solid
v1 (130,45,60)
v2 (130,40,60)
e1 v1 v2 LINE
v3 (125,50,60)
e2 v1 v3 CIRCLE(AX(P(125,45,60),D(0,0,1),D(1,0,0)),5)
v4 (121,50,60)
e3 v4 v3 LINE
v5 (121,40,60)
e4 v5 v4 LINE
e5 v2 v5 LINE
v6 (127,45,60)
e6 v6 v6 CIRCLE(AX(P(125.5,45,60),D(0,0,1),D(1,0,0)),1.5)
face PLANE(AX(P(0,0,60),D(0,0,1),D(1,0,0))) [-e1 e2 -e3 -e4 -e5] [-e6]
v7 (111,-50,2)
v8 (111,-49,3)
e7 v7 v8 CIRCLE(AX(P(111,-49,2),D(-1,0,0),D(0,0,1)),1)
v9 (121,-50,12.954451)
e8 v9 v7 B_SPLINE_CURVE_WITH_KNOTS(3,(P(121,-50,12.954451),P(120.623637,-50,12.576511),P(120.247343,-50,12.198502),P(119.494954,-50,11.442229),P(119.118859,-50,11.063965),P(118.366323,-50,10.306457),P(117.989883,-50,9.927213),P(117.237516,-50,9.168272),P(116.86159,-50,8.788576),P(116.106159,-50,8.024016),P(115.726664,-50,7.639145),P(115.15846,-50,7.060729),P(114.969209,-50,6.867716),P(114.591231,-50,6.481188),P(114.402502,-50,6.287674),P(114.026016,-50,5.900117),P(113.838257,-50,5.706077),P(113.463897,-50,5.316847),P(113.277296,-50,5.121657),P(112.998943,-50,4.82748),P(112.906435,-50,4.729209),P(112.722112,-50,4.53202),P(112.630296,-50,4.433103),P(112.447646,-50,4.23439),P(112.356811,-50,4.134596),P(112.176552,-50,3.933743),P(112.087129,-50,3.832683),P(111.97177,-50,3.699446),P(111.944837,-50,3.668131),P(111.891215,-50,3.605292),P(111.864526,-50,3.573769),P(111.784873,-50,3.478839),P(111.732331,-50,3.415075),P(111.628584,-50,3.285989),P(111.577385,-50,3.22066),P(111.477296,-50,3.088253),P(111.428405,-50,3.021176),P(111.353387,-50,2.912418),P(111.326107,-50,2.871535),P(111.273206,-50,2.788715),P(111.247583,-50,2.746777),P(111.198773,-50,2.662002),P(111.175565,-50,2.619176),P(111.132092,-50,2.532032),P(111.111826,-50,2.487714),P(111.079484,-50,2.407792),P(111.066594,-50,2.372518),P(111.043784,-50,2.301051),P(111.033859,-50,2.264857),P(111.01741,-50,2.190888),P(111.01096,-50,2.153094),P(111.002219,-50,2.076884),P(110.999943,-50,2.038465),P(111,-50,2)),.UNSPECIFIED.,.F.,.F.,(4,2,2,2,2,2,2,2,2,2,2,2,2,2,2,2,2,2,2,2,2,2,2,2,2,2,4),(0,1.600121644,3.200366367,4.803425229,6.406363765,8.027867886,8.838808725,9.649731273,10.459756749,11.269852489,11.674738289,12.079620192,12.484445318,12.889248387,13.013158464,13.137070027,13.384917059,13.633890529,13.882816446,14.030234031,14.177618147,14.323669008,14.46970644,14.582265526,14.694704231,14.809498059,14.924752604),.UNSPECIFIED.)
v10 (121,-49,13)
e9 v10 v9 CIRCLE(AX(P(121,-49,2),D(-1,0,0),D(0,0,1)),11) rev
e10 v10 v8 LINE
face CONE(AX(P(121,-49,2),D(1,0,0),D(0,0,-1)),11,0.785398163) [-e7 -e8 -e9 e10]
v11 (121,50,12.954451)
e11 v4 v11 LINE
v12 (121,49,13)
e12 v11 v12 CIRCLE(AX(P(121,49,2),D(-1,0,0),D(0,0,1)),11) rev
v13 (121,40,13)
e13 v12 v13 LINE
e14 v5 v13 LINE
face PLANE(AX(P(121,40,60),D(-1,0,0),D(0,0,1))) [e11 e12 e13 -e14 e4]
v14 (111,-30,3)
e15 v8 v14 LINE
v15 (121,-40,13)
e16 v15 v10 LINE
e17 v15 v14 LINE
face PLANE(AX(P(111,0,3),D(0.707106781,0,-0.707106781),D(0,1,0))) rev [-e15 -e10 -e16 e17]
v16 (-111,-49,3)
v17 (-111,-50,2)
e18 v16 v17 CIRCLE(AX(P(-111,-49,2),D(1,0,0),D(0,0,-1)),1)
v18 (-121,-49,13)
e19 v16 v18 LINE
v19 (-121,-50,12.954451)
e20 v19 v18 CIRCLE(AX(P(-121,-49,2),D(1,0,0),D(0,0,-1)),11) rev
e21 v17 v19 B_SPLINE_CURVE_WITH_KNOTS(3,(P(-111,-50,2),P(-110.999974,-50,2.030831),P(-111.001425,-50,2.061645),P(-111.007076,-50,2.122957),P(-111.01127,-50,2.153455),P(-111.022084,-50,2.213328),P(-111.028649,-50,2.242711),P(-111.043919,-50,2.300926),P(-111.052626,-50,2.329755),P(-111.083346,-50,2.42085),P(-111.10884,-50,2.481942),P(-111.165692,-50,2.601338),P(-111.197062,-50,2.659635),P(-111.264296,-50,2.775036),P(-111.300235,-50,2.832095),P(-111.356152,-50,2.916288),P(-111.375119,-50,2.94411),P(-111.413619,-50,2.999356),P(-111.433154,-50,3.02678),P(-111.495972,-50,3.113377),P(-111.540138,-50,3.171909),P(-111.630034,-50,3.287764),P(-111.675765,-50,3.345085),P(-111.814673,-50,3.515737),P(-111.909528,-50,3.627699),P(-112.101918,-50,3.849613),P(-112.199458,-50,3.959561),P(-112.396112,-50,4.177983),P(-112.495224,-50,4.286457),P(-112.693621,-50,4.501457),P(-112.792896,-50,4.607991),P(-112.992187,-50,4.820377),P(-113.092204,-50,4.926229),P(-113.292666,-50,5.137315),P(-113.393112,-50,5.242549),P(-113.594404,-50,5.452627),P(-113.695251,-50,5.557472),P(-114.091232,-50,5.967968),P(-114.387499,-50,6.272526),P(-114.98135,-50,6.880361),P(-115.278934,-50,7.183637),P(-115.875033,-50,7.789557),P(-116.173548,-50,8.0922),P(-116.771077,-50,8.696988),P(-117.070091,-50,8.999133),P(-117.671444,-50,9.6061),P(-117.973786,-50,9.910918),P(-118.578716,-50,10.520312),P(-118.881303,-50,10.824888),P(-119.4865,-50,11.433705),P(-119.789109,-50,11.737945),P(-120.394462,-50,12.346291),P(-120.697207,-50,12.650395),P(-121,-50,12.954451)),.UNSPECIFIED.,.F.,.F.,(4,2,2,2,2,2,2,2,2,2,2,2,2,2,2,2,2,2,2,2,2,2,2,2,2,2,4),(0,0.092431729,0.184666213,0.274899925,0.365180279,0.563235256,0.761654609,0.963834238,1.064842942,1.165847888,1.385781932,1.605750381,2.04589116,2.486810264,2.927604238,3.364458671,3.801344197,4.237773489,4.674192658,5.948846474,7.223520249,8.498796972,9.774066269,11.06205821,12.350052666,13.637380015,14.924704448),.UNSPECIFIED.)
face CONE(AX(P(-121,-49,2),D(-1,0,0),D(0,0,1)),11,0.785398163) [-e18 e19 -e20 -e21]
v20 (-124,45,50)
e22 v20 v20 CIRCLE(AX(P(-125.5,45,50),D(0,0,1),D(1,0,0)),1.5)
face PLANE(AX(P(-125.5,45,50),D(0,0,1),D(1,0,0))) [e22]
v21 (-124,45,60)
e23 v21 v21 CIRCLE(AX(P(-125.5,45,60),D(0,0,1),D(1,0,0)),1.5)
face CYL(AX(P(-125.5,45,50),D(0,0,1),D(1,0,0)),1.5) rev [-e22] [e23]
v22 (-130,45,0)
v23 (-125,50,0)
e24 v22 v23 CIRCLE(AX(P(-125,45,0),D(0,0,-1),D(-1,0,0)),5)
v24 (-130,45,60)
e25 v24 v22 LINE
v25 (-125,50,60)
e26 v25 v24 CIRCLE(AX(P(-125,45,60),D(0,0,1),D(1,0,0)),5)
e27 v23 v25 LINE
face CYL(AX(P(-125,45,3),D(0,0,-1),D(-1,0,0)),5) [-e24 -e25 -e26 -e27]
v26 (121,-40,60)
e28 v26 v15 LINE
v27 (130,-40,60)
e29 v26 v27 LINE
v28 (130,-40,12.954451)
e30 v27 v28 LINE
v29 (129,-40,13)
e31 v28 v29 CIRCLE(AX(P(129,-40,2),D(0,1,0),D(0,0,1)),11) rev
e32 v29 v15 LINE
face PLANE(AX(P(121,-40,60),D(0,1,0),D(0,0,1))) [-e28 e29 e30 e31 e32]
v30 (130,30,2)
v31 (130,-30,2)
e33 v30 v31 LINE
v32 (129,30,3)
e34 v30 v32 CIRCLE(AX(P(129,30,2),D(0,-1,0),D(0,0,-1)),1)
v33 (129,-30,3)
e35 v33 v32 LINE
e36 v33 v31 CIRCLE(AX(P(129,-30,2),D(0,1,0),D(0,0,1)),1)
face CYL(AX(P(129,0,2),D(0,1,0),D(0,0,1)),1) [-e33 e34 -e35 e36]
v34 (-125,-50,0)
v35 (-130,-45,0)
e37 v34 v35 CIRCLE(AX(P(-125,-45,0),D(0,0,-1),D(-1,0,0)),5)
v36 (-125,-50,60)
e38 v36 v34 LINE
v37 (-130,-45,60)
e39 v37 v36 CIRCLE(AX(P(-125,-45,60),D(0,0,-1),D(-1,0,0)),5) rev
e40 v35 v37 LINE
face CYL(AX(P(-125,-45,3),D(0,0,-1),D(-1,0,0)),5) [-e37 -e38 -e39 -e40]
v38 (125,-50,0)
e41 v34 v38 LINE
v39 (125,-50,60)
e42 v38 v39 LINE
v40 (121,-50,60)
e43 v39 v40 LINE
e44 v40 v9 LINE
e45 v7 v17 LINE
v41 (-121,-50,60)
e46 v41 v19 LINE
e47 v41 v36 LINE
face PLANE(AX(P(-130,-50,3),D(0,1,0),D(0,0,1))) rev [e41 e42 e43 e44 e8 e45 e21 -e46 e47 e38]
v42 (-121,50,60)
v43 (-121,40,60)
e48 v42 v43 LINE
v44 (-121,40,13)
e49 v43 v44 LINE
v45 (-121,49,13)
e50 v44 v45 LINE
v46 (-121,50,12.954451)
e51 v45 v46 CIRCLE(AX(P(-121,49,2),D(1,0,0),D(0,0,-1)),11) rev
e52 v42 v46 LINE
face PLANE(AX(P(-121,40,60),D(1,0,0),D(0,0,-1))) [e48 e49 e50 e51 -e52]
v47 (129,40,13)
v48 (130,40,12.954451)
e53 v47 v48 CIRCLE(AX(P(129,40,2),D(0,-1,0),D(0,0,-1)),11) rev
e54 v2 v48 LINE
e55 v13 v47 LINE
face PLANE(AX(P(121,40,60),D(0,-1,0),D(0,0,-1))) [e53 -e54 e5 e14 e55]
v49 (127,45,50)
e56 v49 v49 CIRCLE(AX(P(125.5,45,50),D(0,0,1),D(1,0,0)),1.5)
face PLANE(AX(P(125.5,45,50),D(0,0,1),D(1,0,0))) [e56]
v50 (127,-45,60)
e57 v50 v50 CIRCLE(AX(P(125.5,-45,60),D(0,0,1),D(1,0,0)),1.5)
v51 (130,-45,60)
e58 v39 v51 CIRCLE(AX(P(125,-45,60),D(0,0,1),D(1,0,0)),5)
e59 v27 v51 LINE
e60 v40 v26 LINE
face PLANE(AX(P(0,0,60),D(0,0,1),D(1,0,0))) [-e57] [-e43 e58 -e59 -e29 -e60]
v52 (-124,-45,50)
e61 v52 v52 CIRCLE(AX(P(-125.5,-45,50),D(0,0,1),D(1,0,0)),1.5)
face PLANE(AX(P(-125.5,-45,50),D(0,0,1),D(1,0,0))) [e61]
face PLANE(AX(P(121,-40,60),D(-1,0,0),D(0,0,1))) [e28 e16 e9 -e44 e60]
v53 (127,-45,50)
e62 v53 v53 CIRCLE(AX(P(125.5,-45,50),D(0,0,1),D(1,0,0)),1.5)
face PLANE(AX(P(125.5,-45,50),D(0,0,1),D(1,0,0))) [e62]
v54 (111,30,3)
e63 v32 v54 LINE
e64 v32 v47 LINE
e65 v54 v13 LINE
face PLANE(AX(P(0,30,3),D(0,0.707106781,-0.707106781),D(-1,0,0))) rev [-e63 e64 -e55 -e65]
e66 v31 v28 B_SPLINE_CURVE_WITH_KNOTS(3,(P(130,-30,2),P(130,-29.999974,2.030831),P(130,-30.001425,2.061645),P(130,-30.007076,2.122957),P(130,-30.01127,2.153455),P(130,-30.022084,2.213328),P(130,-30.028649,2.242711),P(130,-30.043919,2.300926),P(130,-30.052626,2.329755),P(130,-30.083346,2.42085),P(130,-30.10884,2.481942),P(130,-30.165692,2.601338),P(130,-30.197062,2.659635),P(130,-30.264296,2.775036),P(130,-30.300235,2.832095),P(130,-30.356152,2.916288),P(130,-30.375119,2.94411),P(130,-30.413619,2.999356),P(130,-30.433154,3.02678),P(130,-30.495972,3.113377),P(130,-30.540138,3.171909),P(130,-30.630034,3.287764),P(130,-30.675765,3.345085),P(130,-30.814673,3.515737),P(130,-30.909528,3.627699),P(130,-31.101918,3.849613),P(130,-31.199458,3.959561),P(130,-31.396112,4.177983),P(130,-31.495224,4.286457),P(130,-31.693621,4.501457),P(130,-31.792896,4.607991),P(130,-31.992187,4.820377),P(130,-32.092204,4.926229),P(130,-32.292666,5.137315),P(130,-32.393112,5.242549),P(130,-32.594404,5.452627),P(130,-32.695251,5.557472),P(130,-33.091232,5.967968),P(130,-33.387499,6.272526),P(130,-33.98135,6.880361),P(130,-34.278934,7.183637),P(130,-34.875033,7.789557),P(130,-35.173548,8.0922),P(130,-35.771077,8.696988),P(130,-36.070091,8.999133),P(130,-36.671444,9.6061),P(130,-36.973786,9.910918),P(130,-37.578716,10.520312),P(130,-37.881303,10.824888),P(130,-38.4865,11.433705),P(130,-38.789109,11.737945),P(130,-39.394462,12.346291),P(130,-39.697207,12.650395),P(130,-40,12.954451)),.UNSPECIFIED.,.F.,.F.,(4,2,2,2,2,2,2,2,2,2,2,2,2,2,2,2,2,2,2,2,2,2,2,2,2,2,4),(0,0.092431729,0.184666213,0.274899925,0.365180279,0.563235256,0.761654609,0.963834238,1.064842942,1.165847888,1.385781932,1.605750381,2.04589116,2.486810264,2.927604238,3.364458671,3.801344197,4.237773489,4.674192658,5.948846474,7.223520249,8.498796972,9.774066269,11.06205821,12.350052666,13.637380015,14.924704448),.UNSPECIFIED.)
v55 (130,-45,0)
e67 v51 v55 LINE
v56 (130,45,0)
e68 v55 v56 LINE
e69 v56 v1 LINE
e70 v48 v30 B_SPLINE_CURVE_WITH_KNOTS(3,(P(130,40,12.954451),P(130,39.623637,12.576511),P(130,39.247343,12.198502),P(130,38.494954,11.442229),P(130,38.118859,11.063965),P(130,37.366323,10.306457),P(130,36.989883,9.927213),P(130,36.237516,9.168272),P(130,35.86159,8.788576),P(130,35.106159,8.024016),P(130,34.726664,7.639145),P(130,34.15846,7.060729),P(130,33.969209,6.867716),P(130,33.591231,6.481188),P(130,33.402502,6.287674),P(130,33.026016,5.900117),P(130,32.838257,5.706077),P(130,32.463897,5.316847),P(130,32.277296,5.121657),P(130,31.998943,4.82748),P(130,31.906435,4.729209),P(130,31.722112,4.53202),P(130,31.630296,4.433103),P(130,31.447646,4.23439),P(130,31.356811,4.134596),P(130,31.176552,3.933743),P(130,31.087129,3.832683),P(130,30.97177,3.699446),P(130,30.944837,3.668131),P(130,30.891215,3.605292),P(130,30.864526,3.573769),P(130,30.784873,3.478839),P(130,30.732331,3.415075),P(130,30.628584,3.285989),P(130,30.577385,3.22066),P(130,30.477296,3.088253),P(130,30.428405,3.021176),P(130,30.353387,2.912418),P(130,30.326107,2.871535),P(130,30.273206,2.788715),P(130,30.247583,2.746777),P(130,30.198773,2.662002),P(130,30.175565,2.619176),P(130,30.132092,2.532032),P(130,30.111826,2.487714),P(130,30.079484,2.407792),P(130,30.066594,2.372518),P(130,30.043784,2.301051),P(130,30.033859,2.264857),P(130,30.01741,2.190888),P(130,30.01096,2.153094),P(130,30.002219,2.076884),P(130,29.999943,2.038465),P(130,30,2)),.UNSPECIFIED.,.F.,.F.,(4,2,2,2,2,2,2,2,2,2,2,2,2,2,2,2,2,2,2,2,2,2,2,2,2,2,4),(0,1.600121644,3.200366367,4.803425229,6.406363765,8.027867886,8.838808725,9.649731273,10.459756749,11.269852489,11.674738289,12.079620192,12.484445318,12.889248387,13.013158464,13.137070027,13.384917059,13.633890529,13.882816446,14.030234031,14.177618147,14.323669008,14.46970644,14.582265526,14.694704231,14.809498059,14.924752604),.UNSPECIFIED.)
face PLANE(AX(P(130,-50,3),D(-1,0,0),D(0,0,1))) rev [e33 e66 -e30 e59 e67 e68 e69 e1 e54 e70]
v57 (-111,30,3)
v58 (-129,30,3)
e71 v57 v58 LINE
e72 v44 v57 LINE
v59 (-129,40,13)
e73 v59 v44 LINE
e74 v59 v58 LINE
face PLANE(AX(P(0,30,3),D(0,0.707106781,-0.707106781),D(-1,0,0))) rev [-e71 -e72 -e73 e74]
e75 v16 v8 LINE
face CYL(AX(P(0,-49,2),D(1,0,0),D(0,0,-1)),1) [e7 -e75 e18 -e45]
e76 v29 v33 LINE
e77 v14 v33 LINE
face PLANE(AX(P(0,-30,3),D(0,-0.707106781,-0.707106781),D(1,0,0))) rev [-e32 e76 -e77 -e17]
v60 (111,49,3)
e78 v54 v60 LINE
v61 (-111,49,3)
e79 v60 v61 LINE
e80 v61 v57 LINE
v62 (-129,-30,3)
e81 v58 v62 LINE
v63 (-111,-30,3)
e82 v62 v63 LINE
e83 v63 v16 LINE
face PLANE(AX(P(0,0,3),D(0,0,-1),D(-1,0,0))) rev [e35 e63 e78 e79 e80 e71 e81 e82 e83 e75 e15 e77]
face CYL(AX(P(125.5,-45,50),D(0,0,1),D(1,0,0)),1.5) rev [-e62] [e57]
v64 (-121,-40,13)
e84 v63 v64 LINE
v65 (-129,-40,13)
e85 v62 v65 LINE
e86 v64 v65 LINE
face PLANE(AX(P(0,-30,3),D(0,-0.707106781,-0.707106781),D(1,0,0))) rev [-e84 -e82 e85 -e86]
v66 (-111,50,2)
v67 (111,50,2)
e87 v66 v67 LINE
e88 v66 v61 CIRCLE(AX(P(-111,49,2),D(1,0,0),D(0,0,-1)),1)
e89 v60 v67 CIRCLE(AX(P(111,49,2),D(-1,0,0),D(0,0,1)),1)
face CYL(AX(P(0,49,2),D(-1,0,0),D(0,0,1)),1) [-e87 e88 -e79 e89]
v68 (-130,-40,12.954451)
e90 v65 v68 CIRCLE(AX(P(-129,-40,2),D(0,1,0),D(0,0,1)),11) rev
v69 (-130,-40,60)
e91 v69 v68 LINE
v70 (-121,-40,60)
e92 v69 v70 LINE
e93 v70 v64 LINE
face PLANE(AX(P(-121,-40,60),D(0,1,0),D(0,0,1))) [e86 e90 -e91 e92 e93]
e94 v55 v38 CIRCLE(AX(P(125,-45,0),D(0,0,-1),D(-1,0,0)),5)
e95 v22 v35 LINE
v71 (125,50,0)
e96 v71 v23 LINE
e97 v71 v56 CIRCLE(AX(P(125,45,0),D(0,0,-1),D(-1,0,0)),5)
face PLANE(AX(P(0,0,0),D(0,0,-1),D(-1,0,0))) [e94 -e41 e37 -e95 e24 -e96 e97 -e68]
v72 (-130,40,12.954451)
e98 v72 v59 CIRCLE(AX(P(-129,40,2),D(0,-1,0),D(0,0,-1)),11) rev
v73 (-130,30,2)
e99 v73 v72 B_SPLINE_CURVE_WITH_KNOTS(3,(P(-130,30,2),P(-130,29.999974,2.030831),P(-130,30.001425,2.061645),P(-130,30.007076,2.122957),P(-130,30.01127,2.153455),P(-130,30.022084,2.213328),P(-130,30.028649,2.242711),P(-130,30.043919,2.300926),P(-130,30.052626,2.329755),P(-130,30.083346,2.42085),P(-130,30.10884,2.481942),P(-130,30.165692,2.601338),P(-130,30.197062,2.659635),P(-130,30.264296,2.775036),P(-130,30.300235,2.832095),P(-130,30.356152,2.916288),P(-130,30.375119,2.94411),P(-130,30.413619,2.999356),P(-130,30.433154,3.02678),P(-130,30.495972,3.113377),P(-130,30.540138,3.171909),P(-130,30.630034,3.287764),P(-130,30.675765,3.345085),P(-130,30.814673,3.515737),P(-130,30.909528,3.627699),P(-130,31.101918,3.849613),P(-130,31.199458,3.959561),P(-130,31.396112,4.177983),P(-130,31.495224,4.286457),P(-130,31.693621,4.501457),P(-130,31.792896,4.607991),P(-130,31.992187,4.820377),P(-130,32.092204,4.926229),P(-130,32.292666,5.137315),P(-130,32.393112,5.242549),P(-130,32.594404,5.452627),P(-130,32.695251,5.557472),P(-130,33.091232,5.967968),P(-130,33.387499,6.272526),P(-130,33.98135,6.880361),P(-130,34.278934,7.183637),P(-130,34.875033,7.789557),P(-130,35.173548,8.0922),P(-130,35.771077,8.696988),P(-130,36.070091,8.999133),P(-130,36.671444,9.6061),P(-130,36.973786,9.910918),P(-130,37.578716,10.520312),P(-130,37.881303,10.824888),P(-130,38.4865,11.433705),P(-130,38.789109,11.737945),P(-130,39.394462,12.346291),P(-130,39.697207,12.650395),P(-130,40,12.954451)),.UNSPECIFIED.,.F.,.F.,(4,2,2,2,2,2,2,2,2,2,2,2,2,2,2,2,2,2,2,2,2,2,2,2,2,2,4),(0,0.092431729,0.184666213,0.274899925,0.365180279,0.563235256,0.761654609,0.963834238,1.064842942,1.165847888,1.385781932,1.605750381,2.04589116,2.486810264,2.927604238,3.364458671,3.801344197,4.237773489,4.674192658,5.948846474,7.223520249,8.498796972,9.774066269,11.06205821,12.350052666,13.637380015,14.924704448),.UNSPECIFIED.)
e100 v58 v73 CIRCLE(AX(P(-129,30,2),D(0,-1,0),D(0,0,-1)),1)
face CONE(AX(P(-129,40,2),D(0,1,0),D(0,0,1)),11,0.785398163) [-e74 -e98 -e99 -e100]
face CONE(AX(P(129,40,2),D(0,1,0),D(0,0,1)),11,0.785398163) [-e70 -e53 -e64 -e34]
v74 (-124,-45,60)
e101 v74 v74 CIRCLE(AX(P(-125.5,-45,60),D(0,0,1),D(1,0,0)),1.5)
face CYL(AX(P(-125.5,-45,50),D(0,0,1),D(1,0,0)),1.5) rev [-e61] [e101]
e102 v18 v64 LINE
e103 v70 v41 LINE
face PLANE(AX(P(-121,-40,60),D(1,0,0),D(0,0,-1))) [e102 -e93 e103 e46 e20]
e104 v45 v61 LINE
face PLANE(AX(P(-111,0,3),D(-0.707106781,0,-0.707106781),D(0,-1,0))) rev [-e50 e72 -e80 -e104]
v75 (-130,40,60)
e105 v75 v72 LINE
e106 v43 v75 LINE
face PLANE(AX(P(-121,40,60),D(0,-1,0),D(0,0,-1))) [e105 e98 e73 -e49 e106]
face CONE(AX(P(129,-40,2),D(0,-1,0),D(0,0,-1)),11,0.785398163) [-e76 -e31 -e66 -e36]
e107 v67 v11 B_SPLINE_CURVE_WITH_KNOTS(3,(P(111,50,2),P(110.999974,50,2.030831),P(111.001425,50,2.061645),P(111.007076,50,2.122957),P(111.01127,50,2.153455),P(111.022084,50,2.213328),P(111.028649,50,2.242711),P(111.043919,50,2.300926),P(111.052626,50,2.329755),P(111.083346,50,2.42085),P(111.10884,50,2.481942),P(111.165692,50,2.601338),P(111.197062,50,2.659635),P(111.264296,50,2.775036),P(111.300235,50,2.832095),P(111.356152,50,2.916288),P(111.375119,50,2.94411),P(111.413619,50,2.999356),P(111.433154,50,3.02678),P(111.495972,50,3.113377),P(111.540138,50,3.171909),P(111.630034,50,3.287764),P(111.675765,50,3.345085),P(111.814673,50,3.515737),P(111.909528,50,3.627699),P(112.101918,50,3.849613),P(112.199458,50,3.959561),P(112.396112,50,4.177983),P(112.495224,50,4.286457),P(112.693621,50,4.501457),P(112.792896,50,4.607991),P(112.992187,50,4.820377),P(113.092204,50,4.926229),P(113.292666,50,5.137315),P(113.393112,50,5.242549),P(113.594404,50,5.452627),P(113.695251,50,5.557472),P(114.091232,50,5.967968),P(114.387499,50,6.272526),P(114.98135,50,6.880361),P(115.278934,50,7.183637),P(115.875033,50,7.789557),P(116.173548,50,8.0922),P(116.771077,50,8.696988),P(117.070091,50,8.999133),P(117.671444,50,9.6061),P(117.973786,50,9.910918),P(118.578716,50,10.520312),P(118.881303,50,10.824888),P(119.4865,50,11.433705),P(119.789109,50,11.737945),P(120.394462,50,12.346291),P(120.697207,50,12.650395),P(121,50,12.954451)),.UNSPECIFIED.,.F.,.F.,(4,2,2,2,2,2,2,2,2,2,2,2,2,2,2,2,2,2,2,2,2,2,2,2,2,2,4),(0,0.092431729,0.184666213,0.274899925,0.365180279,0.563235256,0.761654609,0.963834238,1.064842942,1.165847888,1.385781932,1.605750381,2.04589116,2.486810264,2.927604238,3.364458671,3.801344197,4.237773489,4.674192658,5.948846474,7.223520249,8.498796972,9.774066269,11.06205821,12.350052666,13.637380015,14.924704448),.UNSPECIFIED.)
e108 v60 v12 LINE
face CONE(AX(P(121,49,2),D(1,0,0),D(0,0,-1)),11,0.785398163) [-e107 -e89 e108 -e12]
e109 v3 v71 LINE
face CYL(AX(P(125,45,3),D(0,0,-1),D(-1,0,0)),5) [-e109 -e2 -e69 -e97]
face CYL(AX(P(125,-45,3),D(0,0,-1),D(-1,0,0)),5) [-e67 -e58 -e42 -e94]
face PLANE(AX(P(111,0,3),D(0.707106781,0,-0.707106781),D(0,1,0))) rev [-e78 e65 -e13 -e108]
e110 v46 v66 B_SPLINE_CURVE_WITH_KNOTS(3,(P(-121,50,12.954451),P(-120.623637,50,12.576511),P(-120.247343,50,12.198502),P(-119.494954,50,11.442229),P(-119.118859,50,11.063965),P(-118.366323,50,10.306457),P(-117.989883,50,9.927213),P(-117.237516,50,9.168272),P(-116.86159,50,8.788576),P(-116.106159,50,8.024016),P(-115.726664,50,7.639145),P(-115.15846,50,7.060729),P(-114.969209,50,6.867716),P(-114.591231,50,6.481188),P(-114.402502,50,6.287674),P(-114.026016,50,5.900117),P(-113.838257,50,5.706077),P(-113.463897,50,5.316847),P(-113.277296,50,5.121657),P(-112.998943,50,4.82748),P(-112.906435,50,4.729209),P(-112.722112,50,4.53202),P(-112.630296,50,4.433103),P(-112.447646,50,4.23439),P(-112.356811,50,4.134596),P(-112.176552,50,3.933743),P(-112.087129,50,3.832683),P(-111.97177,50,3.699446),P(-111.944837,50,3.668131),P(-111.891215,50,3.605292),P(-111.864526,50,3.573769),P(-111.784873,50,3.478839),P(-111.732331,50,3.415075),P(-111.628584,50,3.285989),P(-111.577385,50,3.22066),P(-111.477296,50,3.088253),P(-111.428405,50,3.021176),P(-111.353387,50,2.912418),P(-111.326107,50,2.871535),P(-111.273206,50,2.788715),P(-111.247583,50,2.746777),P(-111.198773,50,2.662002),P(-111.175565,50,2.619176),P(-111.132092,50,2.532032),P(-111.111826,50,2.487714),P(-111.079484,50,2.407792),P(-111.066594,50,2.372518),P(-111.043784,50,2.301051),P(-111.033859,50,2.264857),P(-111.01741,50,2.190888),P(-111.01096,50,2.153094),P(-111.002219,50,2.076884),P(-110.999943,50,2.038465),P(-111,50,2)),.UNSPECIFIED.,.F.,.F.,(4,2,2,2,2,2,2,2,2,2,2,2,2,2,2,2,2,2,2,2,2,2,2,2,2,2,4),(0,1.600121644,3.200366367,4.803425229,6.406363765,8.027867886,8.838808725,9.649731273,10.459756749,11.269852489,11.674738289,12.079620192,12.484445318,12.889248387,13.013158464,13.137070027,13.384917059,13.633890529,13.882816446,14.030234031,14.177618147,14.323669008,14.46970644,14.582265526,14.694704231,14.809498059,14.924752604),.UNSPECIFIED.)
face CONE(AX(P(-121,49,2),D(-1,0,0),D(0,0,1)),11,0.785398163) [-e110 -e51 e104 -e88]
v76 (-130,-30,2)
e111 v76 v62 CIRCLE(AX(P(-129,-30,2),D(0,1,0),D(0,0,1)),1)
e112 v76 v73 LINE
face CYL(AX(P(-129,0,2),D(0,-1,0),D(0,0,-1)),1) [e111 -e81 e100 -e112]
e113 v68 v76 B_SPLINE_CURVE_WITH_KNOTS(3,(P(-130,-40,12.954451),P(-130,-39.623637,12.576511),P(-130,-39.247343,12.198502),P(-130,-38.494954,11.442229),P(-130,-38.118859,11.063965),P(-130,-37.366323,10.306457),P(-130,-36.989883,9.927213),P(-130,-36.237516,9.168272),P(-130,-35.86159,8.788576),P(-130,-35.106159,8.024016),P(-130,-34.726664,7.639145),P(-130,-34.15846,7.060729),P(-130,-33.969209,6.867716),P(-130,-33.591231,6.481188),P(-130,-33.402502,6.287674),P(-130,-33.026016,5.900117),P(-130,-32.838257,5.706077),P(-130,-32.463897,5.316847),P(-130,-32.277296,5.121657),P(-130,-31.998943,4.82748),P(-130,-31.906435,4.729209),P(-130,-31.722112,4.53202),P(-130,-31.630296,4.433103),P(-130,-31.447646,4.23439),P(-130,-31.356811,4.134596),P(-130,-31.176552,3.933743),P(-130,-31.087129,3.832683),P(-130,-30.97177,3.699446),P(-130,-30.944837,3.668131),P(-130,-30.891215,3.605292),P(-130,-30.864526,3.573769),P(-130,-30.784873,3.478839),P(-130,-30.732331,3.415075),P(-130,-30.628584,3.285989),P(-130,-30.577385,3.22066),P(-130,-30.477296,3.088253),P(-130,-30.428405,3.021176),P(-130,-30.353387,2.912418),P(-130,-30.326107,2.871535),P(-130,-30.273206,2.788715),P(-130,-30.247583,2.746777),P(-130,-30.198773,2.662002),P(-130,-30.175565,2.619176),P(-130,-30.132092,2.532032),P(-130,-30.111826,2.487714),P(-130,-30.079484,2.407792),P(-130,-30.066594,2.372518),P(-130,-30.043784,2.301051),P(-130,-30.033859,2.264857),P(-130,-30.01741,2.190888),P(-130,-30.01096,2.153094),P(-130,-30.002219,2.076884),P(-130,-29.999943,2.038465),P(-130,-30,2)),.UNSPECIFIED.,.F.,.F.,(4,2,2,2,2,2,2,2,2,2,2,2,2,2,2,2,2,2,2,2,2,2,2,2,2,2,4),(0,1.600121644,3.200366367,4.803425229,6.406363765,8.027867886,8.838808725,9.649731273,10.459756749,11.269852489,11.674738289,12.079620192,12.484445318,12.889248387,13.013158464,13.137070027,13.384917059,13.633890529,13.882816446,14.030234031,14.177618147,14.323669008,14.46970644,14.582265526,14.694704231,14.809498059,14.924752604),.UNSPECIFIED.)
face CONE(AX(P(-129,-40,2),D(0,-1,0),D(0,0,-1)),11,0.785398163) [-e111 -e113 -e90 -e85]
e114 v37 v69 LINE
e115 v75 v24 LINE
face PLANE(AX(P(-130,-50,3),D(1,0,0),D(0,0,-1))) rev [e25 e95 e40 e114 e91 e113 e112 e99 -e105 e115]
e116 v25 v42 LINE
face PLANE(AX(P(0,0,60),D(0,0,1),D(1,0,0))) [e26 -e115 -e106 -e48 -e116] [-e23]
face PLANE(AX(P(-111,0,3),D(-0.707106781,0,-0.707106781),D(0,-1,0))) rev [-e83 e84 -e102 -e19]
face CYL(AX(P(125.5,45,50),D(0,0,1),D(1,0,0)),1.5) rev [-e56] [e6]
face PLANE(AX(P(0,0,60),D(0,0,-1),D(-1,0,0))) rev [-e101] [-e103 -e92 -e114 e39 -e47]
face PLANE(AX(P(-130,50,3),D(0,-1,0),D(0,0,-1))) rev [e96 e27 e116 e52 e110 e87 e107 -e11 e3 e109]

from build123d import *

# Parameters (mm, degrees)
SKETCH_1_W          = 260
SKETCH_1_H          = 100
EXTRUDE_1_DEPTH     = 3
SKETCH_2_W          = 9
SKETCH_2_H          = 10
EXTRUDE_2_DEPTH     = 60
FILLET_3_R          = 5
FILLET_4_R          = 1
SKETCH_3_R          = 1.5
CUT_EXTRUDE_1_DEPTH = 10
CHAMFER_1_SIZE      = 10


with BuildPart() as part:
    # 草图1 → 凸台-拉伸1 (new body)
    with BuildSketch(Plane.XY):
        Rectangle(SKETCH_1_W, SKETCH_1_H)
    extrude(amount=EXTRUDE_1_DEPTH)

    # 草图2 → 凸台-拉伸2 (add)
    with BuildSketch(Plane(origin=(0, 0, 0), x_dir=(-1, 0, 0), z_dir=(0, 0, -1))):
        with Locations((125.5, 45)):
            Rectangle(SKETCH_2_W, SKETCH_2_H)
        with Locations((125.5, -45)):
            Rectangle(SKETCH_2_W, SKETCH_2_H)
        with Locations((-125.5, -45)):
            Rectangle(SKETCH_2_W, SKETCH_2_H)
        with Locations((-125.5, 45)):
            Rectangle(SKETCH_2_W, SKETCH_2_H)
    extrude(amount=-EXTRUDE_2_DEPTH)

    # 圆角3
    fillet_3_edges = [part.edges().sort_by_distance(p)[0] for p in [
        (130, -50, 30),
        (-130, -50, 30),
        (-130, 50, 30),
        (130, 50, 30),
    ]]
    fillet(fillet_3_edges, radius=FILLET_3_R)

    # 圆角4
    fillet_4_edges = [part.edges().sort_by_distance(p)[0] for p in [
        (0, -50, 3),
        (-130, 0, 3),
        (130, 0, 3),
        (0, 50, 3),
    ]]
    fillet(fillet_4_edges, radius=FILLET_4_R)

    # 草图3 → 切除-拉伸1 (cut)
    with BuildSketch(Plane.XY.offset(60)):
        with Locations((125.5, -45)):
            Circle(SKETCH_3_R)
        with Locations((125.5, 45)):
            Circle(SKETCH_3_R)
        with Locations((-125.5, -45)):
            Circle(SKETCH_3_R)
        with Locations((-125.5, 45)):
            Circle(SKETCH_3_R)
    extrude(amount=-CUT_EXTRUDE_1_DEPTH, mode=Mode.SUBTRACT)

    # 倒角1
    # the kernel refuses this chamfer: 10 mm, written as the material it adds along each edge
    with BuildSketch(Plane(origin=(121, 40, 3), x_dir=(0, -1, 0), z_dir=(1, 0, 0))) as chamfer_1_piece_1:
        Polygon((CHAMFER_1_SIZE, 0), (0, -CHAMFER_1_SIZE), (0, 0), align=None)
    extrude(amount=8)
    with BuildSketch(Plane(origin=(-121, 49, 3), x_dir=(1, 0, 0), z_dir=(0, -1, 0))) as chamfer_1_piece_2:
        Polygon((CHAMFER_1_SIZE, 0), (0, CHAMFER_1_SIZE), (0, 0), align=None)
    extrude(amount=9)
    with BuildSketch(Plane(origin=(-129, -40, 3), x_dir=(0, 1, 0), z_dir=(1, 0, 0)), Plane(origin=(-121, 40, 3), x_dir=(0, -1, 0), z_dir=(-1, 0, 0)), Plane(origin=(121, -40, 3), x_dir=(0, 1, 0), z_dir=(1, 0, 0))) as chamfer_1_piece_3:
        Polygon((CHAMFER_1_SIZE, 0), (0, CHAMFER_1_SIZE), (0, 0), align=None)
    extrude(amount=8)
    with BuildSketch(Plane(origin=(121, -49, 3), x_dir=(0, 0, 1), z_dir=(0, 1, 0)), Plane(origin=(-121, -40, 3), x_dir=(0, 0, 1), z_dir=(0, -1, 0)), Plane(origin=(121, 49, 3), x_dir=(-1, 0, 0), z_dir=(0, -1, 0))) as chamfer_1_piece_4:
        Polygon((CHAMFER_1_SIZE, 0), (0, -CHAMFER_1_SIZE), (0, 0), align=None)
    extrude(amount=9)
    with BuildSketch(Plane(origin=(-121, 49, 2), x_dir=(0, 0, 1), z_dir=(0, -1, 0))) as chamfer_1_piece_5_section:
        Polygon((1 + CHAMFER_1_SIZE, 0), (1, -CHAMFER_1_SIZE), (1, 0), align=None)
    chamfer_1_piece_5 = revolve(axis=Axis((-121, 49, 2), (-1, 0, 0)), revolution_arc=359.64, mode=Mode.PRIVATE)
    chamfer_1_piece_5 = split(chamfer_1_piece_5, bisect_by=Plane(origin=(-121, 49, 0), z_dir=(0, 0, 1)), keep=Keep.TOP, mode=Mode.PRIVATE)
    chamfer_1_piece_5 = split(chamfer_1_piece_5, bisect_by=Plane(origin=(-121, 50, 2), z_dir=(0, -1, 0)), keep=Keep.TOP, mode=Mode.PRIVATE)
    add(chamfer_1_piece_5)
    with BuildSketch(Plane(origin=(121, 49, 2), x_dir=(0, 0, 1), z_dir=(0, -1, 0))) as chamfer_1_piece_6_section:
        Polygon((1, CHAMFER_1_SIZE), (1 + CHAMFER_1_SIZE, 0), (1, 0), align=None)
    chamfer_1_piece_6 = revolve(axis=Axis((121, 49, 2), (-1, 0, 0)), revolution_arc=359.64, mode=Mode.PRIVATE)
    chamfer_1_piece_6 = split(chamfer_1_piece_6, bisect_by=Plane(origin=(121, 49, 0), z_dir=(0, 0, 1)), keep=Keep.TOP, mode=Mode.PRIVATE)
    chamfer_1_piece_6 = split(chamfer_1_piece_6, bisect_by=Plane(origin=(121, 50, 2), z_dir=(0, -1, 0)), keep=Keep.TOP, mode=Mode.PRIVATE)
    add(chamfer_1_piece_6)
    with BuildSketch(Plane(origin=(-129, -40, 2), x_dir=(0, 0, 1), z_dir=(1, 0, 0))) as chamfer_1_piece_7_section:
        Polygon((1 + CHAMFER_1_SIZE, 0), (1, -CHAMFER_1_SIZE), (1, 0), align=None)
    chamfer_1_piece_7 = revolve(axis=Axis((-129, -40, 2), (0, -1, 0)), revolution_arc=359.64, mode=Mode.PRIVATE)
    chamfer_1_piece_7 = split(chamfer_1_piece_7, bisect_by=Plane(origin=(-129, -40, 0), z_dir=(0, 0, 1)), keep=Keep.TOP, mode=Mode.PRIVATE)
    chamfer_1_piece_7 = split(chamfer_1_piece_7, bisect_by=Plane(origin=(-130, -40, 2), z_dir=(1, 0, 0)), keep=Keep.TOP, mode=Mode.PRIVATE)
    add(chamfer_1_piece_7)
    with BuildSketch(Plane(origin=(-129, 40, 2), x_dir=(0, 0, 1), z_dir=(1, 0, 0))) as chamfer_1_piece_8_section:
        Polygon((1, CHAMFER_1_SIZE), (1 + CHAMFER_1_SIZE, 0), (1, 0), align=None)
    chamfer_1_piece_8 = revolve(axis=Axis((-129, 40, 2), (0, -1, 0)), revolution_arc=359.64, mode=Mode.PRIVATE)
    chamfer_1_piece_8 = split(chamfer_1_piece_8, bisect_by=Plane(origin=(-129, 40, 0), z_dir=(0, 0, 1)), keep=Keep.TOP, mode=Mode.PRIVATE)
    chamfer_1_piece_8 = split(chamfer_1_piece_8, bisect_by=Plane(origin=(-130, 40, 2), z_dir=(1, 0, 0)), keep=Keep.TOP, mode=Mode.PRIVATE)
    add(chamfer_1_piece_8)
    with BuildSketch(Plane(origin=(129, 40, 2), x_dir=(0, 0, 1), z_dir=(-1, 0, 0))) as chamfer_1_piece_9_section:
        Polygon((1, -CHAMFER_1_SIZE), (1 + CHAMFER_1_SIZE, 0), (1, 0), align=None)
    chamfer_1_piece_9 = revolve(axis=Axis((129, 40, 2), (0, 1, 0)), revolution_arc=359.64, mode=Mode.PRIVATE)
    chamfer_1_piece_9 = split(chamfer_1_piece_9, bisect_by=Plane(origin=(129, 40, 0), z_dir=(0, 0, 1)), keep=Keep.TOP, mode=Mode.PRIVATE)
    chamfer_1_piece_9 = split(chamfer_1_piece_9, bisect_by=Plane(origin=(130, 40, 2), z_dir=(-1, 0, 0)), keep=Keep.TOP, mode=Mode.PRIVATE)
    add(chamfer_1_piece_9)
    with BuildSketch(Plane(origin=(129, -40, 2), x_dir=(0, 0, 1), z_dir=(-1, 0, 0))) as chamfer_1_piece_10_section:
        Polygon((1 + CHAMFER_1_SIZE, 0), (1, CHAMFER_1_SIZE), (1, 0), align=None)
    chamfer_1_piece_10 = revolve(axis=Axis((129, -40, 2), (0, 1, 0)), revolution_arc=359.64, mode=Mode.PRIVATE)
    chamfer_1_piece_10 = split(chamfer_1_piece_10, bisect_by=Plane(origin=(129, -40, 0), z_dir=(0, 0, 1)), keep=Keep.TOP, mode=Mode.PRIVATE)
    chamfer_1_piece_10 = split(chamfer_1_piece_10, bisect_by=Plane(origin=(130, -40, 2), z_dir=(-1, 0, 0)), keep=Keep.TOP, mode=Mode.PRIVATE)
    add(chamfer_1_piece_10)
    with BuildSketch(Plane(origin=(121, -49, 2), x_dir=(0, 0.006283143965553963, 0.9999802608561372), z_dir=(0, -0.9999802608561372, 0.006283143965553963))) as chamfer_1_piece_11_section:
        Polygon((1, CHAMFER_1_SIZE), (1 + CHAMFER_1_SIZE, 0), (1, 0), align=None)
    chamfer_1_piece_11 = revolve(axis=Axis((121, -49, 2), (-1, 0, 0)), revolution_arc=359.64, mode=Mode.PRIVATE)
    chamfer_1_piece_11 = split(chamfer_1_piece_11, bisect_by=Plane(origin=(121, -50, 2), z_dir=(0, 1, 0)), keep=Keep.TOP, mode=Mode.PRIVATE)
    chamfer_1_piece_11 = split(chamfer_1_piece_11, bisect_by=Plane(origin=(121, -49, 0), z_dir=(0, 0, 1)), keep=Keep.TOP, mode=Mode.PRIVATE)
    add(chamfer_1_piece_11)
    with BuildSketch(Plane(origin=(-121, -49, 2), x_dir=(0, 0.006283143965553963, 0.9999802608561372), z_dir=(0, -0.9999802608561372, 0.006283143965553963))) as chamfer_1_piece_12_section:
        Polygon((1 + CHAMFER_1_SIZE, 0), (1, -CHAMFER_1_SIZE), (1, 0), align=None)
    chamfer_1_piece_12 = revolve(axis=Axis((-121, -49, 2), (-1, 0, 0)), revolution_arc=359.64, mode=Mode.PRIVATE)
    chamfer_1_piece_12 = split(chamfer_1_piece_12, bisect_by=Plane(origin=(-121, -50, 2), z_dir=(0, 1, 0)), keep=Keep.TOP, mode=Mode.PRIVATE)
    chamfer_1_piece_12 = split(chamfer_1_piece_12, bisect_by=Plane(origin=(-121, -49, 0), z_dir=(0, 0, 1)), keep=Keep.TOP, mode=Mode.PRIVATE)
    add(chamfer_1_piece_12)
    with BuildSketch(Plane(origin=(95.28317012, 40, 3), x_dir=(0, -1, 0), z_dir=(1, 0, 0))) as chamfer_1_piece_13a_section:
        Polygon((CHAMFER_1_SIZE, 0), (0, -CHAMFER_1_SIZE), (0, 0), align=None)
    chamfer_1_piece_13a = extrude(amount=33.71682988, mode=Mode.PRIVATE)
    chamfer_1_piece_13a = split(chamfer_1_piece_13a, bisect_by=Plane(origin=(121, 40, 3), z_dir=(-1, 0, 0)), keep=Keep.TOP, mode=Mode.PRIVATE)
    with BuildSketch(Plane(origin=(121, 49, 3), x_dir=(-1, 0, 0), z_dir=(0, -1, 0))) as chamfer_1_piece_13b_section:
        Polygon((CHAMFER_1_SIZE, 0), (0, -CHAMFER_1_SIZE), (0, 0), align=None)
    chamfer_1_piece_13b = extrude(amount=34.71682988, mode=Mode.PRIVATE)
    chamfer_1_piece_13b = split(chamfer_1_piece_13b, bisect_by=Plane(origin=(121, 40, 3), z_dir=(0, -1, 0)), keep=Keep.TOP, mode=Mode.PRIVATE)
    chamfer_1_piece_13 = chamfer_1_piece_13a & chamfer_1_piece_13b
    add(chamfer_1_piece_13)
    with BuildSketch(Plane(origin=(-95.28317012, 40, 3), x_dir=(0, -1, 0), z_dir=(-1, 0, 0))) as chamfer_1_piece_14a_section:
        Polygon((CHAMFER_1_SIZE, 0), (0, CHAMFER_1_SIZE), (0, 0), align=None)
    chamfer_1_piece_14a = extrude(amount=33.71682988, mode=Mode.PRIVATE)
    chamfer_1_piece_14a = split(chamfer_1_piece_14a, bisect_by=Plane(origin=(-121, 40, 3), z_dir=(1, 0, 0)), keep=Keep.TOP, mode=Mode.PRIVATE)
    with BuildSketch(Plane(origin=(-121, 49, 3), x_dir=(1, 0, 0), z_dir=(0, -1, 0))) as chamfer_1_piece_14b_section:
        Polygon((CHAMFER_1_SIZE, 0), (0, CHAMFER_1_SIZE), (0, 0), align=None)
    chamfer_1_piece_14b = extrude(amount=34.71682988, mode=Mode.PRIVATE)
    chamfer_1_piece_14b = split(chamfer_1_piece_14b, bisect_by=Plane(origin=(-121, 40, 3), z_dir=(0, -1, 0)), keep=Keep.TOP, mode=Mode.PRIVATE)
    chamfer_1_piece_14 = chamfer_1_piece_14a & chamfer_1_piece_14b
    add(chamfer_1_piece_14)
    with BuildSketch(Plane(origin=(-121, -14.28317012, 3), x_dir=(0, 0, 1), z_dir=(0, -1, 0))) as chamfer_1_piece_15a_section:
        Polygon((CHAMFER_1_SIZE, 0), (0, -CHAMFER_1_SIZE), (0, 0), align=None)
    chamfer_1_piece_15a = extrude(amount=34.71682988, mode=Mode.PRIVATE)
    chamfer_1_piece_15a = split(chamfer_1_piece_15a, bisect_by=Plane(origin=(-121, -40, 3), z_dir=(0, 1, 0)), keep=Keep.TOP, mode=Mode.PRIVATE)
    with BuildSketch(Plane(origin=(-129, -40, 3), x_dir=(0, 1, 0), z_dir=(1, 0, 0))) as chamfer_1_piece_15b_section:
        Polygon((CHAMFER_1_SIZE, 0), (0, CHAMFER_1_SIZE), (0, 0), align=None)
    chamfer_1_piece_15b = extrude(amount=33.71682988, mode=Mode.PRIVATE)
    chamfer_1_piece_15b = split(chamfer_1_piece_15b, bisect_by=Plane(origin=(-121, -40, 3), z_dir=(1, 0, 0)), keep=Keep.TOP, mode=Mode.PRIVATE)
    chamfer_1_piece_15 = chamfer_1_piece_15a & chamfer_1_piece_15b
    add(chamfer_1_piece_15)
    with BuildSketch(Plane(origin=(121, -49, 3), x_dir=(0, 0, 1), z_dir=(0, 1, 0))) as chamfer_1_piece_16a_section:
        Polygon((CHAMFER_1_SIZE, 0), (0, -CHAMFER_1_SIZE), (0, 0), align=None)
    chamfer_1_piece_16a = extrude(amount=34.71682988, mode=Mode.PRIVATE)
    chamfer_1_piece_16a = split(chamfer_1_piece_16a, bisect_by=Plane(origin=(121, -40, 3), z_dir=(0, 1, 0)), keep=Keep.TOP, mode=Mode.PRIVATE)
    with BuildSketch(Plane(origin=(95.28317012, -40, 3), x_dir=(0, 1, 0), z_dir=(1, 0, 0))) as chamfer_1_piece_16b_section:
        Polygon((CHAMFER_1_SIZE, 0), (0, CHAMFER_1_SIZE), (0, 0), align=None)
    chamfer_1_piece_16b = extrude(amount=33.71682988, mode=Mode.PRIVATE)
    chamfer_1_piece_16b = split(chamfer_1_piece_16b, bisect_by=Plane(origin=(121, -40, 3), z_dir=(-1, 0, 0)), keep=Keep.TOP, mode=Mode.PRIVATE)
    chamfer_1_piece_16 = chamfer_1_piece_16a & chamfer_1_piece_16b
    add(chamfer_1_piece_16)


solid = part.part
